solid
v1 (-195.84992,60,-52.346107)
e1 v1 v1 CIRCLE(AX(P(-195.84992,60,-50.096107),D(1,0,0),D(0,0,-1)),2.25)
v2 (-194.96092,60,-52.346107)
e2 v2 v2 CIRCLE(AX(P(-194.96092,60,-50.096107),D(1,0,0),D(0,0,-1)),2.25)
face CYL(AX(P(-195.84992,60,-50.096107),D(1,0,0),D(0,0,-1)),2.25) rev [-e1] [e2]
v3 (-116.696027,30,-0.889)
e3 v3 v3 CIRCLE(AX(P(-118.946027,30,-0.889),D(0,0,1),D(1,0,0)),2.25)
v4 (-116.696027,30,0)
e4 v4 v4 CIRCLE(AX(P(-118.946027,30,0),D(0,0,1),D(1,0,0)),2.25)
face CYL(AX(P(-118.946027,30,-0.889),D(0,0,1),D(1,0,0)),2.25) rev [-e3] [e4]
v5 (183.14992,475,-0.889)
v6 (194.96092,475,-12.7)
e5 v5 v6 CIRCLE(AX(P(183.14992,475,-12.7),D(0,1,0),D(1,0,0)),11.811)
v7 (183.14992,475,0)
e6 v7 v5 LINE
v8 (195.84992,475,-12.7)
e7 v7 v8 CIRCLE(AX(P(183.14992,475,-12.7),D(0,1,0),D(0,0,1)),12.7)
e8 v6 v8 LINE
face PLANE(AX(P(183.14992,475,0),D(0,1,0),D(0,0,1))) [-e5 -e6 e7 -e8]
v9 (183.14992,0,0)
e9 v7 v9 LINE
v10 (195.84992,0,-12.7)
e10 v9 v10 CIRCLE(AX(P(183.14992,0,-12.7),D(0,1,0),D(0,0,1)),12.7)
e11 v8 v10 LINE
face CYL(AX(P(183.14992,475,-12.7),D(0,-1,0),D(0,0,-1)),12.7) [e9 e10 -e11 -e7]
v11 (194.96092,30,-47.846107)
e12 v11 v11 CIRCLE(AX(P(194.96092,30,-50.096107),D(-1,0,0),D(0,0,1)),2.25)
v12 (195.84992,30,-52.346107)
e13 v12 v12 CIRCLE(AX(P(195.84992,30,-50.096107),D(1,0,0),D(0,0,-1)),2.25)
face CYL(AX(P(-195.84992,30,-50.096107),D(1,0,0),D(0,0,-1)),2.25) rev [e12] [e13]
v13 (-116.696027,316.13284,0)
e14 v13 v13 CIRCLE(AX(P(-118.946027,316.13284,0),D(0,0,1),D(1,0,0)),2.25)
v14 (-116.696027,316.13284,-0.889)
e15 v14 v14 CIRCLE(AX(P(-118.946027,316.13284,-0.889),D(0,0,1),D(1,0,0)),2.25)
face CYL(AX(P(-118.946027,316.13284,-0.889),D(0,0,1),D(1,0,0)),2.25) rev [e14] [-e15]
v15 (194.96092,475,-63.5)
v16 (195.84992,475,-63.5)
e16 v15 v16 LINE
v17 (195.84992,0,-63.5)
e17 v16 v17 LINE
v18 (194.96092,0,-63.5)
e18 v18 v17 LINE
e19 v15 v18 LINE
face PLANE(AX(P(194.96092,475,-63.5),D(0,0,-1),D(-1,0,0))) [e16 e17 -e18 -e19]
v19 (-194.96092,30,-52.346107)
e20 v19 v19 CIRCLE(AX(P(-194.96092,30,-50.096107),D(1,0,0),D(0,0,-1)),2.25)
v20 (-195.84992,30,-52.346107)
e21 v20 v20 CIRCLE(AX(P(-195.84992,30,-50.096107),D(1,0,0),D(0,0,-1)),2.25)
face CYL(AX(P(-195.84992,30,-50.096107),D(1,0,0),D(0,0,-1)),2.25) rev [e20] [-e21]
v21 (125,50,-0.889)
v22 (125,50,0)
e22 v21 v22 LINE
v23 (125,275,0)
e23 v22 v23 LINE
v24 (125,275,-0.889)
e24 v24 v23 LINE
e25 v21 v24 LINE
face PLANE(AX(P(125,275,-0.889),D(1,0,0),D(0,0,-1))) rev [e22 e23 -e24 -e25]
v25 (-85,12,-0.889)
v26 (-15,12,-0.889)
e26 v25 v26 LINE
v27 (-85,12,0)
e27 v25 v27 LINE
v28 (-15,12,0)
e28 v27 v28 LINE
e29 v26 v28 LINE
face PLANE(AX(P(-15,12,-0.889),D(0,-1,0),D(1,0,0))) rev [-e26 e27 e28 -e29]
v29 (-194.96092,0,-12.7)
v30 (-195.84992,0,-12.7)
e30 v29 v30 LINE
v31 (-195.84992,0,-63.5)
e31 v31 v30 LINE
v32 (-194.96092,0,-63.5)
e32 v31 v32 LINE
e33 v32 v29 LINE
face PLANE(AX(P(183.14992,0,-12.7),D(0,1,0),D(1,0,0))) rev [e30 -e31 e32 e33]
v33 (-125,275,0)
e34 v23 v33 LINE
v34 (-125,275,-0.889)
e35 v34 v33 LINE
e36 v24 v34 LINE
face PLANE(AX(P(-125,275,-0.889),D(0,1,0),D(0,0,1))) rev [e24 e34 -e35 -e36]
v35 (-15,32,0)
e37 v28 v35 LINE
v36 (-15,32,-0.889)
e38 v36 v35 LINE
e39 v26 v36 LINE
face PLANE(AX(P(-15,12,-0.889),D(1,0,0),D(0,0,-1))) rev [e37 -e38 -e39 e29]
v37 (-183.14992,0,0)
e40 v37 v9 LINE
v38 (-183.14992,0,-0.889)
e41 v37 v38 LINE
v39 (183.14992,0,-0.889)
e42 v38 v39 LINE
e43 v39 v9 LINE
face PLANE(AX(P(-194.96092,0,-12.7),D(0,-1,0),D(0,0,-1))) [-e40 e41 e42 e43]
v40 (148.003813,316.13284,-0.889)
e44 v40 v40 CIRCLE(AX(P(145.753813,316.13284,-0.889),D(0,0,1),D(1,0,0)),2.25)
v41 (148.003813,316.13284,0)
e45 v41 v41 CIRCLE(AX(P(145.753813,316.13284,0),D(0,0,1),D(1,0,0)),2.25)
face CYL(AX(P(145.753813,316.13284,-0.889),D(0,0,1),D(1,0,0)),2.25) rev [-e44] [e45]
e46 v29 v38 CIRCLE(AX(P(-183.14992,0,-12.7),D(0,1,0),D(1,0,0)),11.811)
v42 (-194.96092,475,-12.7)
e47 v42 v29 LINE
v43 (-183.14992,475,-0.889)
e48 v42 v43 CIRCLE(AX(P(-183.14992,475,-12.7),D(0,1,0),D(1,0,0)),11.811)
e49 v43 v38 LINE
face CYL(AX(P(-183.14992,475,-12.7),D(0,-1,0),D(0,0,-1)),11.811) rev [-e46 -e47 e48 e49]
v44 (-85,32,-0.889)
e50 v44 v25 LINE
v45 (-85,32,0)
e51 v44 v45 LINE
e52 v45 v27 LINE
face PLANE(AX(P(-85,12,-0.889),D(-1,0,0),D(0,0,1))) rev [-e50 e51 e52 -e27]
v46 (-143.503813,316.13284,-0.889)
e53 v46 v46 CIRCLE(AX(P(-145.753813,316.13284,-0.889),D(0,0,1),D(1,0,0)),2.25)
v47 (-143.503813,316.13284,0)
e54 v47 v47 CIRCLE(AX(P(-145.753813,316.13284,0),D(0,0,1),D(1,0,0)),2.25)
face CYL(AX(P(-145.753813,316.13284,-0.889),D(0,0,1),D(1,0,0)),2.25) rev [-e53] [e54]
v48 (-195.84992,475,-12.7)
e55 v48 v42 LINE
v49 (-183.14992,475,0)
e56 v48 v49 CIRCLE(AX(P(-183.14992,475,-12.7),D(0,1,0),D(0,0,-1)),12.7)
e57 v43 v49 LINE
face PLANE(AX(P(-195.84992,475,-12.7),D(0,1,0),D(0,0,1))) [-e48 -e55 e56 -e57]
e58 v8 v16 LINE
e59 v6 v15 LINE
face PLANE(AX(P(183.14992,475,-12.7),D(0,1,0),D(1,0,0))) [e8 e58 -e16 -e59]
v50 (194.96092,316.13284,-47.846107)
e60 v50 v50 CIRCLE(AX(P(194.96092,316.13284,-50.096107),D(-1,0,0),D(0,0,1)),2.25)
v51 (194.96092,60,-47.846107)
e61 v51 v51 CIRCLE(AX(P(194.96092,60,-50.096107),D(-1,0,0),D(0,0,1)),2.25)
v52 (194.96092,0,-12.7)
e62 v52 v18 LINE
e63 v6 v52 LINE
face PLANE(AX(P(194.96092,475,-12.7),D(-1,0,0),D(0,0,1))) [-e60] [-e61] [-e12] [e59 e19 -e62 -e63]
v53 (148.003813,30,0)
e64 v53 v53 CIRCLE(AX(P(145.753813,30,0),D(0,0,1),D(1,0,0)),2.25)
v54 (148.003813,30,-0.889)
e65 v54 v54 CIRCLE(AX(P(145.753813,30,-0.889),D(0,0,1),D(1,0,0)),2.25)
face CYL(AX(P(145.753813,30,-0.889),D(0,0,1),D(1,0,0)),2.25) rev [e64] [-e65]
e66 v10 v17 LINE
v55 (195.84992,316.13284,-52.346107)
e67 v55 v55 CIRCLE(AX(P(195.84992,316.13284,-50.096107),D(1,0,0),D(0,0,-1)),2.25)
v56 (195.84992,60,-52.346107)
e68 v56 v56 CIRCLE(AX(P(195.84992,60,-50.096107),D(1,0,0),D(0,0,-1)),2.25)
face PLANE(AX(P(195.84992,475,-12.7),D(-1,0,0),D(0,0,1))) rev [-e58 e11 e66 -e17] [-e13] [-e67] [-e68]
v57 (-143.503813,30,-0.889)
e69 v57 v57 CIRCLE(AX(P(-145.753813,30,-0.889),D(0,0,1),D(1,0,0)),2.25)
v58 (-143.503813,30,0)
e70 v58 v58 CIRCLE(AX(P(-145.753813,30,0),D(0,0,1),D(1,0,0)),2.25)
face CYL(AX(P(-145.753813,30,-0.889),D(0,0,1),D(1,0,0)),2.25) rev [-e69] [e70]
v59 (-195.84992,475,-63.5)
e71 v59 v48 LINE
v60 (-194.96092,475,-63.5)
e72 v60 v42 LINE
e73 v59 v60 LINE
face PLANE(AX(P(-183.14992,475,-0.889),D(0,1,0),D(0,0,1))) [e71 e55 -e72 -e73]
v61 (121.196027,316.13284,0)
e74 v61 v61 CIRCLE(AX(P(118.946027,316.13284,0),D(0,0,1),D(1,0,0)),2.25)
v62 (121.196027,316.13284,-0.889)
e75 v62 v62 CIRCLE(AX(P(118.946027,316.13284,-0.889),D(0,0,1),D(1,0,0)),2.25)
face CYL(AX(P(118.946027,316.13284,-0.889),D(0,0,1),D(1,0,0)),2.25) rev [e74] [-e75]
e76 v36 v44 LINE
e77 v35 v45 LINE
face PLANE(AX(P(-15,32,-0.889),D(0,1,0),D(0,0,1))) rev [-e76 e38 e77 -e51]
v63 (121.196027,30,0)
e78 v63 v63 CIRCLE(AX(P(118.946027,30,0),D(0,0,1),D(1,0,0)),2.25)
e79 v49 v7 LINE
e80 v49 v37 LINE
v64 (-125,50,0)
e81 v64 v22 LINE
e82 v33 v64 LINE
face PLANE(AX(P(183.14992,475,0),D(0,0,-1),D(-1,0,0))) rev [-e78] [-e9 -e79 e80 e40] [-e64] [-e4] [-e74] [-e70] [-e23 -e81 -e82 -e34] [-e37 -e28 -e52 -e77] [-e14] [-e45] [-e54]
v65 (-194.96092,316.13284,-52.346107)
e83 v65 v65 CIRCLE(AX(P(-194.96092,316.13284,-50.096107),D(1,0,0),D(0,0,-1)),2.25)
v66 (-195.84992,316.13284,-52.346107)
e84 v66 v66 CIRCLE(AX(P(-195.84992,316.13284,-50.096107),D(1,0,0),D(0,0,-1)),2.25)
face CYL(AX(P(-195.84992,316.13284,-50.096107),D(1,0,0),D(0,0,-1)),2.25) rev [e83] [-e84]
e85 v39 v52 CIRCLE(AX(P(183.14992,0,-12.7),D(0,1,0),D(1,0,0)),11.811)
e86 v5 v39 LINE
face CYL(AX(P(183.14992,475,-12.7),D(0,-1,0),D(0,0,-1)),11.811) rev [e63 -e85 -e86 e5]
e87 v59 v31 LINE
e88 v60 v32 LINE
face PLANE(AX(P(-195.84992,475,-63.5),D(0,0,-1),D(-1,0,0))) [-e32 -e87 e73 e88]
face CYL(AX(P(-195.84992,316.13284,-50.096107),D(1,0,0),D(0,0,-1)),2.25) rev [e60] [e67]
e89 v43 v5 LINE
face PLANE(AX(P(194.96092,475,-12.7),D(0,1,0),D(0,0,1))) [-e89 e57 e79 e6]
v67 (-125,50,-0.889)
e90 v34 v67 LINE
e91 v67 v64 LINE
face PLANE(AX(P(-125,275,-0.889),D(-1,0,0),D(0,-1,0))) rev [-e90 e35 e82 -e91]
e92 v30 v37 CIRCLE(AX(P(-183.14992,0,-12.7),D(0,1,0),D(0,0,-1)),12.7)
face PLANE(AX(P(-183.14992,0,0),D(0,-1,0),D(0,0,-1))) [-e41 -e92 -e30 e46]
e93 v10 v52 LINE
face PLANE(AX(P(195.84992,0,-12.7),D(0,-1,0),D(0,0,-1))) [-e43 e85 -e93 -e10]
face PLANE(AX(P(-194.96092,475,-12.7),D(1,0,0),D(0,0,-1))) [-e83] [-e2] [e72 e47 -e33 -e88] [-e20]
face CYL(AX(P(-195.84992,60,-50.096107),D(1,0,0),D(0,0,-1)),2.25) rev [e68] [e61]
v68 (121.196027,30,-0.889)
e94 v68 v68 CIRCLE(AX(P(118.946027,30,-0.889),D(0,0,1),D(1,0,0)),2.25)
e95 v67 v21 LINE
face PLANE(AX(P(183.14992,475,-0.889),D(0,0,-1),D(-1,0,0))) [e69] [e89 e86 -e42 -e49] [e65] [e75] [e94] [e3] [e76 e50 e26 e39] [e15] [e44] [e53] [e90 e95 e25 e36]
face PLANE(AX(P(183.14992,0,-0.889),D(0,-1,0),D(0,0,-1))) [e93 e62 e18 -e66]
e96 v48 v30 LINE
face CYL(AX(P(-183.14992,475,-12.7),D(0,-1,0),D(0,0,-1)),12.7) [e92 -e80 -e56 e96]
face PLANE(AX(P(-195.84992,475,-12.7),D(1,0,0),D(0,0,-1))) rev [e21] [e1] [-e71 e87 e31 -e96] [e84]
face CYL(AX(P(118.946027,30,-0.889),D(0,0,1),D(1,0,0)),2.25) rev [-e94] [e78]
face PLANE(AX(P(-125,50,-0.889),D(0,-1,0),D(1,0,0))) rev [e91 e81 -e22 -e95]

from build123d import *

# Parameters (mm, degrees)
BASE_FLANGE2_DEPTH = 475
SKETCH6_W          = 250
SKETCH6_H          = 225
CUT_EXTRUDE2_DEPTH = 2.54
SKETCH13_R         = 2.25
CUT_EXTRUDE4_DEPTH = 619.939427238
SKETCH14_R         = 2.25
CUT_EXTRUDE5_DEPTH = 0.889
SKETCH15_W         = 70
SKETCH15_H         = 20
CUT_EXTRUDE6_DEPTH = 0.889


# Sheet-metal steps are written as plain solids
with BuildPart() as part:
    # Sketch1 → Base-Flange2 (new body)
    with BuildSketch(Plane(origin=(0, 0, 0), x_dir=(1, 0, 0), z_dir=(0, 1, 0))):
        with BuildLine():
            Line((195.849919958, 63.5), (195.849919958, 12.7))
            ThreePointArc((195.849919958, 12.7), (192.130176079, 3.719743879), (183.149919958, 0))
            Line((183.149919958, 0), (-183.149919958, 0))
            ThreePointArc((-183.149919958, 0), (-192.130176079, 3.719743879), (-195.849919958, 12.7))
            Line((-195.849919958, 12.7), (-195.849919958, 63.5))
            Line((-195.849919958, 63.5), (-194.960919958, 63.5))
            Line((-194.960919958, 63.5), (-194.960919958, 12.7))
            ThreePointArc((-194.960919958, 12.7), (-191.501558151, 4.348361807), (-183.149919958, 0.889))
            Line((-183.149919958, 0.889), (183.149919958, 0.889))
            ThreePointArc((183.149919958, 0.889), (191.501558151, 4.348361807), (194.960919958, 12.7))
            Line((194.960919958, 12.7), (194.960919958, 63.5))
            Line((194.960919958, 63.5), (195.849919958, 63.5))
        make_face()
    extrude(amount=BASE_FLANGE2_DEPTH)

    # Sketch6 → Cut-Extrude2 (cut)
    with BuildSketch(Plane.XY):
        with Locations((0, 162.5)):
            Rectangle(SKETCH6_W, SKETCH6_H)
    extrude(amount=-CUT_EXTRUDE2_DEPTH, mode=Mode.SUBTRACT)

    # Sketch13 → Cut-Extrude4 (cut, through all)
    with BuildSketch(Plane(origin=(195.849919958, 0, 0), x_dir=(0, 0, -1), z_dir=(1, 0, 0))):
        with Locations((50.096107, 60)):
            Circle(SKETCH13_R)
        with Locations((50.096107, 316.132840032)):
            Circle(SKETCH13_R)
        with Locations((50.096107, 30)):
            Circle(SKETCH13_R)
    extrude(amount=-CUT_EXTRUDE4_DEPTH, mode=Mode.SUBTRACT)

    # Sketch14 → Cut-Extrude5 (cut)
    with BuildSketch(Plane.XY):
        with Locations((-145.753813013, 316.132839976)):
            Circle(SKETCH14_R)
        with Locations((-118.946026903, 316.132839976)):
            Circle(SKETCH14_R)
        with Locations((118.946026903, 316.132839976)):
            Circle(SKETCH14_R)
        with Locations((145.753813013, 316.132839976)):
            Circle(SKETCH14_R)
        with Locations((145.753813013, 30)):
            Circle(SKETCH14_R)
        with Locations((118.946026903, 30)):
            Circle(SKETCH14_R)
        with Locations((-118.946026903, 30)):
            Circle(SKETCH14_R)
        with Locations((-145.753813013, 30)):
            Circle(SKETCH14_R)
    extrude(amount=-CUT_EXTRUDE5_DEPTH, mode=Mode.SUBTRACT)

    # Sketch15 → Cut-Extrude6 (cut)
    with BuildSketch(Plane.XY):
        with Locations((-50, 22)):
            Rectangle(SKETCH15_W, SKETCH15_H)
    extrude(amount=-CUT_EXTRUDE6_DEPTH, mode=Mode.SUBTRACT)


solid = part.part
